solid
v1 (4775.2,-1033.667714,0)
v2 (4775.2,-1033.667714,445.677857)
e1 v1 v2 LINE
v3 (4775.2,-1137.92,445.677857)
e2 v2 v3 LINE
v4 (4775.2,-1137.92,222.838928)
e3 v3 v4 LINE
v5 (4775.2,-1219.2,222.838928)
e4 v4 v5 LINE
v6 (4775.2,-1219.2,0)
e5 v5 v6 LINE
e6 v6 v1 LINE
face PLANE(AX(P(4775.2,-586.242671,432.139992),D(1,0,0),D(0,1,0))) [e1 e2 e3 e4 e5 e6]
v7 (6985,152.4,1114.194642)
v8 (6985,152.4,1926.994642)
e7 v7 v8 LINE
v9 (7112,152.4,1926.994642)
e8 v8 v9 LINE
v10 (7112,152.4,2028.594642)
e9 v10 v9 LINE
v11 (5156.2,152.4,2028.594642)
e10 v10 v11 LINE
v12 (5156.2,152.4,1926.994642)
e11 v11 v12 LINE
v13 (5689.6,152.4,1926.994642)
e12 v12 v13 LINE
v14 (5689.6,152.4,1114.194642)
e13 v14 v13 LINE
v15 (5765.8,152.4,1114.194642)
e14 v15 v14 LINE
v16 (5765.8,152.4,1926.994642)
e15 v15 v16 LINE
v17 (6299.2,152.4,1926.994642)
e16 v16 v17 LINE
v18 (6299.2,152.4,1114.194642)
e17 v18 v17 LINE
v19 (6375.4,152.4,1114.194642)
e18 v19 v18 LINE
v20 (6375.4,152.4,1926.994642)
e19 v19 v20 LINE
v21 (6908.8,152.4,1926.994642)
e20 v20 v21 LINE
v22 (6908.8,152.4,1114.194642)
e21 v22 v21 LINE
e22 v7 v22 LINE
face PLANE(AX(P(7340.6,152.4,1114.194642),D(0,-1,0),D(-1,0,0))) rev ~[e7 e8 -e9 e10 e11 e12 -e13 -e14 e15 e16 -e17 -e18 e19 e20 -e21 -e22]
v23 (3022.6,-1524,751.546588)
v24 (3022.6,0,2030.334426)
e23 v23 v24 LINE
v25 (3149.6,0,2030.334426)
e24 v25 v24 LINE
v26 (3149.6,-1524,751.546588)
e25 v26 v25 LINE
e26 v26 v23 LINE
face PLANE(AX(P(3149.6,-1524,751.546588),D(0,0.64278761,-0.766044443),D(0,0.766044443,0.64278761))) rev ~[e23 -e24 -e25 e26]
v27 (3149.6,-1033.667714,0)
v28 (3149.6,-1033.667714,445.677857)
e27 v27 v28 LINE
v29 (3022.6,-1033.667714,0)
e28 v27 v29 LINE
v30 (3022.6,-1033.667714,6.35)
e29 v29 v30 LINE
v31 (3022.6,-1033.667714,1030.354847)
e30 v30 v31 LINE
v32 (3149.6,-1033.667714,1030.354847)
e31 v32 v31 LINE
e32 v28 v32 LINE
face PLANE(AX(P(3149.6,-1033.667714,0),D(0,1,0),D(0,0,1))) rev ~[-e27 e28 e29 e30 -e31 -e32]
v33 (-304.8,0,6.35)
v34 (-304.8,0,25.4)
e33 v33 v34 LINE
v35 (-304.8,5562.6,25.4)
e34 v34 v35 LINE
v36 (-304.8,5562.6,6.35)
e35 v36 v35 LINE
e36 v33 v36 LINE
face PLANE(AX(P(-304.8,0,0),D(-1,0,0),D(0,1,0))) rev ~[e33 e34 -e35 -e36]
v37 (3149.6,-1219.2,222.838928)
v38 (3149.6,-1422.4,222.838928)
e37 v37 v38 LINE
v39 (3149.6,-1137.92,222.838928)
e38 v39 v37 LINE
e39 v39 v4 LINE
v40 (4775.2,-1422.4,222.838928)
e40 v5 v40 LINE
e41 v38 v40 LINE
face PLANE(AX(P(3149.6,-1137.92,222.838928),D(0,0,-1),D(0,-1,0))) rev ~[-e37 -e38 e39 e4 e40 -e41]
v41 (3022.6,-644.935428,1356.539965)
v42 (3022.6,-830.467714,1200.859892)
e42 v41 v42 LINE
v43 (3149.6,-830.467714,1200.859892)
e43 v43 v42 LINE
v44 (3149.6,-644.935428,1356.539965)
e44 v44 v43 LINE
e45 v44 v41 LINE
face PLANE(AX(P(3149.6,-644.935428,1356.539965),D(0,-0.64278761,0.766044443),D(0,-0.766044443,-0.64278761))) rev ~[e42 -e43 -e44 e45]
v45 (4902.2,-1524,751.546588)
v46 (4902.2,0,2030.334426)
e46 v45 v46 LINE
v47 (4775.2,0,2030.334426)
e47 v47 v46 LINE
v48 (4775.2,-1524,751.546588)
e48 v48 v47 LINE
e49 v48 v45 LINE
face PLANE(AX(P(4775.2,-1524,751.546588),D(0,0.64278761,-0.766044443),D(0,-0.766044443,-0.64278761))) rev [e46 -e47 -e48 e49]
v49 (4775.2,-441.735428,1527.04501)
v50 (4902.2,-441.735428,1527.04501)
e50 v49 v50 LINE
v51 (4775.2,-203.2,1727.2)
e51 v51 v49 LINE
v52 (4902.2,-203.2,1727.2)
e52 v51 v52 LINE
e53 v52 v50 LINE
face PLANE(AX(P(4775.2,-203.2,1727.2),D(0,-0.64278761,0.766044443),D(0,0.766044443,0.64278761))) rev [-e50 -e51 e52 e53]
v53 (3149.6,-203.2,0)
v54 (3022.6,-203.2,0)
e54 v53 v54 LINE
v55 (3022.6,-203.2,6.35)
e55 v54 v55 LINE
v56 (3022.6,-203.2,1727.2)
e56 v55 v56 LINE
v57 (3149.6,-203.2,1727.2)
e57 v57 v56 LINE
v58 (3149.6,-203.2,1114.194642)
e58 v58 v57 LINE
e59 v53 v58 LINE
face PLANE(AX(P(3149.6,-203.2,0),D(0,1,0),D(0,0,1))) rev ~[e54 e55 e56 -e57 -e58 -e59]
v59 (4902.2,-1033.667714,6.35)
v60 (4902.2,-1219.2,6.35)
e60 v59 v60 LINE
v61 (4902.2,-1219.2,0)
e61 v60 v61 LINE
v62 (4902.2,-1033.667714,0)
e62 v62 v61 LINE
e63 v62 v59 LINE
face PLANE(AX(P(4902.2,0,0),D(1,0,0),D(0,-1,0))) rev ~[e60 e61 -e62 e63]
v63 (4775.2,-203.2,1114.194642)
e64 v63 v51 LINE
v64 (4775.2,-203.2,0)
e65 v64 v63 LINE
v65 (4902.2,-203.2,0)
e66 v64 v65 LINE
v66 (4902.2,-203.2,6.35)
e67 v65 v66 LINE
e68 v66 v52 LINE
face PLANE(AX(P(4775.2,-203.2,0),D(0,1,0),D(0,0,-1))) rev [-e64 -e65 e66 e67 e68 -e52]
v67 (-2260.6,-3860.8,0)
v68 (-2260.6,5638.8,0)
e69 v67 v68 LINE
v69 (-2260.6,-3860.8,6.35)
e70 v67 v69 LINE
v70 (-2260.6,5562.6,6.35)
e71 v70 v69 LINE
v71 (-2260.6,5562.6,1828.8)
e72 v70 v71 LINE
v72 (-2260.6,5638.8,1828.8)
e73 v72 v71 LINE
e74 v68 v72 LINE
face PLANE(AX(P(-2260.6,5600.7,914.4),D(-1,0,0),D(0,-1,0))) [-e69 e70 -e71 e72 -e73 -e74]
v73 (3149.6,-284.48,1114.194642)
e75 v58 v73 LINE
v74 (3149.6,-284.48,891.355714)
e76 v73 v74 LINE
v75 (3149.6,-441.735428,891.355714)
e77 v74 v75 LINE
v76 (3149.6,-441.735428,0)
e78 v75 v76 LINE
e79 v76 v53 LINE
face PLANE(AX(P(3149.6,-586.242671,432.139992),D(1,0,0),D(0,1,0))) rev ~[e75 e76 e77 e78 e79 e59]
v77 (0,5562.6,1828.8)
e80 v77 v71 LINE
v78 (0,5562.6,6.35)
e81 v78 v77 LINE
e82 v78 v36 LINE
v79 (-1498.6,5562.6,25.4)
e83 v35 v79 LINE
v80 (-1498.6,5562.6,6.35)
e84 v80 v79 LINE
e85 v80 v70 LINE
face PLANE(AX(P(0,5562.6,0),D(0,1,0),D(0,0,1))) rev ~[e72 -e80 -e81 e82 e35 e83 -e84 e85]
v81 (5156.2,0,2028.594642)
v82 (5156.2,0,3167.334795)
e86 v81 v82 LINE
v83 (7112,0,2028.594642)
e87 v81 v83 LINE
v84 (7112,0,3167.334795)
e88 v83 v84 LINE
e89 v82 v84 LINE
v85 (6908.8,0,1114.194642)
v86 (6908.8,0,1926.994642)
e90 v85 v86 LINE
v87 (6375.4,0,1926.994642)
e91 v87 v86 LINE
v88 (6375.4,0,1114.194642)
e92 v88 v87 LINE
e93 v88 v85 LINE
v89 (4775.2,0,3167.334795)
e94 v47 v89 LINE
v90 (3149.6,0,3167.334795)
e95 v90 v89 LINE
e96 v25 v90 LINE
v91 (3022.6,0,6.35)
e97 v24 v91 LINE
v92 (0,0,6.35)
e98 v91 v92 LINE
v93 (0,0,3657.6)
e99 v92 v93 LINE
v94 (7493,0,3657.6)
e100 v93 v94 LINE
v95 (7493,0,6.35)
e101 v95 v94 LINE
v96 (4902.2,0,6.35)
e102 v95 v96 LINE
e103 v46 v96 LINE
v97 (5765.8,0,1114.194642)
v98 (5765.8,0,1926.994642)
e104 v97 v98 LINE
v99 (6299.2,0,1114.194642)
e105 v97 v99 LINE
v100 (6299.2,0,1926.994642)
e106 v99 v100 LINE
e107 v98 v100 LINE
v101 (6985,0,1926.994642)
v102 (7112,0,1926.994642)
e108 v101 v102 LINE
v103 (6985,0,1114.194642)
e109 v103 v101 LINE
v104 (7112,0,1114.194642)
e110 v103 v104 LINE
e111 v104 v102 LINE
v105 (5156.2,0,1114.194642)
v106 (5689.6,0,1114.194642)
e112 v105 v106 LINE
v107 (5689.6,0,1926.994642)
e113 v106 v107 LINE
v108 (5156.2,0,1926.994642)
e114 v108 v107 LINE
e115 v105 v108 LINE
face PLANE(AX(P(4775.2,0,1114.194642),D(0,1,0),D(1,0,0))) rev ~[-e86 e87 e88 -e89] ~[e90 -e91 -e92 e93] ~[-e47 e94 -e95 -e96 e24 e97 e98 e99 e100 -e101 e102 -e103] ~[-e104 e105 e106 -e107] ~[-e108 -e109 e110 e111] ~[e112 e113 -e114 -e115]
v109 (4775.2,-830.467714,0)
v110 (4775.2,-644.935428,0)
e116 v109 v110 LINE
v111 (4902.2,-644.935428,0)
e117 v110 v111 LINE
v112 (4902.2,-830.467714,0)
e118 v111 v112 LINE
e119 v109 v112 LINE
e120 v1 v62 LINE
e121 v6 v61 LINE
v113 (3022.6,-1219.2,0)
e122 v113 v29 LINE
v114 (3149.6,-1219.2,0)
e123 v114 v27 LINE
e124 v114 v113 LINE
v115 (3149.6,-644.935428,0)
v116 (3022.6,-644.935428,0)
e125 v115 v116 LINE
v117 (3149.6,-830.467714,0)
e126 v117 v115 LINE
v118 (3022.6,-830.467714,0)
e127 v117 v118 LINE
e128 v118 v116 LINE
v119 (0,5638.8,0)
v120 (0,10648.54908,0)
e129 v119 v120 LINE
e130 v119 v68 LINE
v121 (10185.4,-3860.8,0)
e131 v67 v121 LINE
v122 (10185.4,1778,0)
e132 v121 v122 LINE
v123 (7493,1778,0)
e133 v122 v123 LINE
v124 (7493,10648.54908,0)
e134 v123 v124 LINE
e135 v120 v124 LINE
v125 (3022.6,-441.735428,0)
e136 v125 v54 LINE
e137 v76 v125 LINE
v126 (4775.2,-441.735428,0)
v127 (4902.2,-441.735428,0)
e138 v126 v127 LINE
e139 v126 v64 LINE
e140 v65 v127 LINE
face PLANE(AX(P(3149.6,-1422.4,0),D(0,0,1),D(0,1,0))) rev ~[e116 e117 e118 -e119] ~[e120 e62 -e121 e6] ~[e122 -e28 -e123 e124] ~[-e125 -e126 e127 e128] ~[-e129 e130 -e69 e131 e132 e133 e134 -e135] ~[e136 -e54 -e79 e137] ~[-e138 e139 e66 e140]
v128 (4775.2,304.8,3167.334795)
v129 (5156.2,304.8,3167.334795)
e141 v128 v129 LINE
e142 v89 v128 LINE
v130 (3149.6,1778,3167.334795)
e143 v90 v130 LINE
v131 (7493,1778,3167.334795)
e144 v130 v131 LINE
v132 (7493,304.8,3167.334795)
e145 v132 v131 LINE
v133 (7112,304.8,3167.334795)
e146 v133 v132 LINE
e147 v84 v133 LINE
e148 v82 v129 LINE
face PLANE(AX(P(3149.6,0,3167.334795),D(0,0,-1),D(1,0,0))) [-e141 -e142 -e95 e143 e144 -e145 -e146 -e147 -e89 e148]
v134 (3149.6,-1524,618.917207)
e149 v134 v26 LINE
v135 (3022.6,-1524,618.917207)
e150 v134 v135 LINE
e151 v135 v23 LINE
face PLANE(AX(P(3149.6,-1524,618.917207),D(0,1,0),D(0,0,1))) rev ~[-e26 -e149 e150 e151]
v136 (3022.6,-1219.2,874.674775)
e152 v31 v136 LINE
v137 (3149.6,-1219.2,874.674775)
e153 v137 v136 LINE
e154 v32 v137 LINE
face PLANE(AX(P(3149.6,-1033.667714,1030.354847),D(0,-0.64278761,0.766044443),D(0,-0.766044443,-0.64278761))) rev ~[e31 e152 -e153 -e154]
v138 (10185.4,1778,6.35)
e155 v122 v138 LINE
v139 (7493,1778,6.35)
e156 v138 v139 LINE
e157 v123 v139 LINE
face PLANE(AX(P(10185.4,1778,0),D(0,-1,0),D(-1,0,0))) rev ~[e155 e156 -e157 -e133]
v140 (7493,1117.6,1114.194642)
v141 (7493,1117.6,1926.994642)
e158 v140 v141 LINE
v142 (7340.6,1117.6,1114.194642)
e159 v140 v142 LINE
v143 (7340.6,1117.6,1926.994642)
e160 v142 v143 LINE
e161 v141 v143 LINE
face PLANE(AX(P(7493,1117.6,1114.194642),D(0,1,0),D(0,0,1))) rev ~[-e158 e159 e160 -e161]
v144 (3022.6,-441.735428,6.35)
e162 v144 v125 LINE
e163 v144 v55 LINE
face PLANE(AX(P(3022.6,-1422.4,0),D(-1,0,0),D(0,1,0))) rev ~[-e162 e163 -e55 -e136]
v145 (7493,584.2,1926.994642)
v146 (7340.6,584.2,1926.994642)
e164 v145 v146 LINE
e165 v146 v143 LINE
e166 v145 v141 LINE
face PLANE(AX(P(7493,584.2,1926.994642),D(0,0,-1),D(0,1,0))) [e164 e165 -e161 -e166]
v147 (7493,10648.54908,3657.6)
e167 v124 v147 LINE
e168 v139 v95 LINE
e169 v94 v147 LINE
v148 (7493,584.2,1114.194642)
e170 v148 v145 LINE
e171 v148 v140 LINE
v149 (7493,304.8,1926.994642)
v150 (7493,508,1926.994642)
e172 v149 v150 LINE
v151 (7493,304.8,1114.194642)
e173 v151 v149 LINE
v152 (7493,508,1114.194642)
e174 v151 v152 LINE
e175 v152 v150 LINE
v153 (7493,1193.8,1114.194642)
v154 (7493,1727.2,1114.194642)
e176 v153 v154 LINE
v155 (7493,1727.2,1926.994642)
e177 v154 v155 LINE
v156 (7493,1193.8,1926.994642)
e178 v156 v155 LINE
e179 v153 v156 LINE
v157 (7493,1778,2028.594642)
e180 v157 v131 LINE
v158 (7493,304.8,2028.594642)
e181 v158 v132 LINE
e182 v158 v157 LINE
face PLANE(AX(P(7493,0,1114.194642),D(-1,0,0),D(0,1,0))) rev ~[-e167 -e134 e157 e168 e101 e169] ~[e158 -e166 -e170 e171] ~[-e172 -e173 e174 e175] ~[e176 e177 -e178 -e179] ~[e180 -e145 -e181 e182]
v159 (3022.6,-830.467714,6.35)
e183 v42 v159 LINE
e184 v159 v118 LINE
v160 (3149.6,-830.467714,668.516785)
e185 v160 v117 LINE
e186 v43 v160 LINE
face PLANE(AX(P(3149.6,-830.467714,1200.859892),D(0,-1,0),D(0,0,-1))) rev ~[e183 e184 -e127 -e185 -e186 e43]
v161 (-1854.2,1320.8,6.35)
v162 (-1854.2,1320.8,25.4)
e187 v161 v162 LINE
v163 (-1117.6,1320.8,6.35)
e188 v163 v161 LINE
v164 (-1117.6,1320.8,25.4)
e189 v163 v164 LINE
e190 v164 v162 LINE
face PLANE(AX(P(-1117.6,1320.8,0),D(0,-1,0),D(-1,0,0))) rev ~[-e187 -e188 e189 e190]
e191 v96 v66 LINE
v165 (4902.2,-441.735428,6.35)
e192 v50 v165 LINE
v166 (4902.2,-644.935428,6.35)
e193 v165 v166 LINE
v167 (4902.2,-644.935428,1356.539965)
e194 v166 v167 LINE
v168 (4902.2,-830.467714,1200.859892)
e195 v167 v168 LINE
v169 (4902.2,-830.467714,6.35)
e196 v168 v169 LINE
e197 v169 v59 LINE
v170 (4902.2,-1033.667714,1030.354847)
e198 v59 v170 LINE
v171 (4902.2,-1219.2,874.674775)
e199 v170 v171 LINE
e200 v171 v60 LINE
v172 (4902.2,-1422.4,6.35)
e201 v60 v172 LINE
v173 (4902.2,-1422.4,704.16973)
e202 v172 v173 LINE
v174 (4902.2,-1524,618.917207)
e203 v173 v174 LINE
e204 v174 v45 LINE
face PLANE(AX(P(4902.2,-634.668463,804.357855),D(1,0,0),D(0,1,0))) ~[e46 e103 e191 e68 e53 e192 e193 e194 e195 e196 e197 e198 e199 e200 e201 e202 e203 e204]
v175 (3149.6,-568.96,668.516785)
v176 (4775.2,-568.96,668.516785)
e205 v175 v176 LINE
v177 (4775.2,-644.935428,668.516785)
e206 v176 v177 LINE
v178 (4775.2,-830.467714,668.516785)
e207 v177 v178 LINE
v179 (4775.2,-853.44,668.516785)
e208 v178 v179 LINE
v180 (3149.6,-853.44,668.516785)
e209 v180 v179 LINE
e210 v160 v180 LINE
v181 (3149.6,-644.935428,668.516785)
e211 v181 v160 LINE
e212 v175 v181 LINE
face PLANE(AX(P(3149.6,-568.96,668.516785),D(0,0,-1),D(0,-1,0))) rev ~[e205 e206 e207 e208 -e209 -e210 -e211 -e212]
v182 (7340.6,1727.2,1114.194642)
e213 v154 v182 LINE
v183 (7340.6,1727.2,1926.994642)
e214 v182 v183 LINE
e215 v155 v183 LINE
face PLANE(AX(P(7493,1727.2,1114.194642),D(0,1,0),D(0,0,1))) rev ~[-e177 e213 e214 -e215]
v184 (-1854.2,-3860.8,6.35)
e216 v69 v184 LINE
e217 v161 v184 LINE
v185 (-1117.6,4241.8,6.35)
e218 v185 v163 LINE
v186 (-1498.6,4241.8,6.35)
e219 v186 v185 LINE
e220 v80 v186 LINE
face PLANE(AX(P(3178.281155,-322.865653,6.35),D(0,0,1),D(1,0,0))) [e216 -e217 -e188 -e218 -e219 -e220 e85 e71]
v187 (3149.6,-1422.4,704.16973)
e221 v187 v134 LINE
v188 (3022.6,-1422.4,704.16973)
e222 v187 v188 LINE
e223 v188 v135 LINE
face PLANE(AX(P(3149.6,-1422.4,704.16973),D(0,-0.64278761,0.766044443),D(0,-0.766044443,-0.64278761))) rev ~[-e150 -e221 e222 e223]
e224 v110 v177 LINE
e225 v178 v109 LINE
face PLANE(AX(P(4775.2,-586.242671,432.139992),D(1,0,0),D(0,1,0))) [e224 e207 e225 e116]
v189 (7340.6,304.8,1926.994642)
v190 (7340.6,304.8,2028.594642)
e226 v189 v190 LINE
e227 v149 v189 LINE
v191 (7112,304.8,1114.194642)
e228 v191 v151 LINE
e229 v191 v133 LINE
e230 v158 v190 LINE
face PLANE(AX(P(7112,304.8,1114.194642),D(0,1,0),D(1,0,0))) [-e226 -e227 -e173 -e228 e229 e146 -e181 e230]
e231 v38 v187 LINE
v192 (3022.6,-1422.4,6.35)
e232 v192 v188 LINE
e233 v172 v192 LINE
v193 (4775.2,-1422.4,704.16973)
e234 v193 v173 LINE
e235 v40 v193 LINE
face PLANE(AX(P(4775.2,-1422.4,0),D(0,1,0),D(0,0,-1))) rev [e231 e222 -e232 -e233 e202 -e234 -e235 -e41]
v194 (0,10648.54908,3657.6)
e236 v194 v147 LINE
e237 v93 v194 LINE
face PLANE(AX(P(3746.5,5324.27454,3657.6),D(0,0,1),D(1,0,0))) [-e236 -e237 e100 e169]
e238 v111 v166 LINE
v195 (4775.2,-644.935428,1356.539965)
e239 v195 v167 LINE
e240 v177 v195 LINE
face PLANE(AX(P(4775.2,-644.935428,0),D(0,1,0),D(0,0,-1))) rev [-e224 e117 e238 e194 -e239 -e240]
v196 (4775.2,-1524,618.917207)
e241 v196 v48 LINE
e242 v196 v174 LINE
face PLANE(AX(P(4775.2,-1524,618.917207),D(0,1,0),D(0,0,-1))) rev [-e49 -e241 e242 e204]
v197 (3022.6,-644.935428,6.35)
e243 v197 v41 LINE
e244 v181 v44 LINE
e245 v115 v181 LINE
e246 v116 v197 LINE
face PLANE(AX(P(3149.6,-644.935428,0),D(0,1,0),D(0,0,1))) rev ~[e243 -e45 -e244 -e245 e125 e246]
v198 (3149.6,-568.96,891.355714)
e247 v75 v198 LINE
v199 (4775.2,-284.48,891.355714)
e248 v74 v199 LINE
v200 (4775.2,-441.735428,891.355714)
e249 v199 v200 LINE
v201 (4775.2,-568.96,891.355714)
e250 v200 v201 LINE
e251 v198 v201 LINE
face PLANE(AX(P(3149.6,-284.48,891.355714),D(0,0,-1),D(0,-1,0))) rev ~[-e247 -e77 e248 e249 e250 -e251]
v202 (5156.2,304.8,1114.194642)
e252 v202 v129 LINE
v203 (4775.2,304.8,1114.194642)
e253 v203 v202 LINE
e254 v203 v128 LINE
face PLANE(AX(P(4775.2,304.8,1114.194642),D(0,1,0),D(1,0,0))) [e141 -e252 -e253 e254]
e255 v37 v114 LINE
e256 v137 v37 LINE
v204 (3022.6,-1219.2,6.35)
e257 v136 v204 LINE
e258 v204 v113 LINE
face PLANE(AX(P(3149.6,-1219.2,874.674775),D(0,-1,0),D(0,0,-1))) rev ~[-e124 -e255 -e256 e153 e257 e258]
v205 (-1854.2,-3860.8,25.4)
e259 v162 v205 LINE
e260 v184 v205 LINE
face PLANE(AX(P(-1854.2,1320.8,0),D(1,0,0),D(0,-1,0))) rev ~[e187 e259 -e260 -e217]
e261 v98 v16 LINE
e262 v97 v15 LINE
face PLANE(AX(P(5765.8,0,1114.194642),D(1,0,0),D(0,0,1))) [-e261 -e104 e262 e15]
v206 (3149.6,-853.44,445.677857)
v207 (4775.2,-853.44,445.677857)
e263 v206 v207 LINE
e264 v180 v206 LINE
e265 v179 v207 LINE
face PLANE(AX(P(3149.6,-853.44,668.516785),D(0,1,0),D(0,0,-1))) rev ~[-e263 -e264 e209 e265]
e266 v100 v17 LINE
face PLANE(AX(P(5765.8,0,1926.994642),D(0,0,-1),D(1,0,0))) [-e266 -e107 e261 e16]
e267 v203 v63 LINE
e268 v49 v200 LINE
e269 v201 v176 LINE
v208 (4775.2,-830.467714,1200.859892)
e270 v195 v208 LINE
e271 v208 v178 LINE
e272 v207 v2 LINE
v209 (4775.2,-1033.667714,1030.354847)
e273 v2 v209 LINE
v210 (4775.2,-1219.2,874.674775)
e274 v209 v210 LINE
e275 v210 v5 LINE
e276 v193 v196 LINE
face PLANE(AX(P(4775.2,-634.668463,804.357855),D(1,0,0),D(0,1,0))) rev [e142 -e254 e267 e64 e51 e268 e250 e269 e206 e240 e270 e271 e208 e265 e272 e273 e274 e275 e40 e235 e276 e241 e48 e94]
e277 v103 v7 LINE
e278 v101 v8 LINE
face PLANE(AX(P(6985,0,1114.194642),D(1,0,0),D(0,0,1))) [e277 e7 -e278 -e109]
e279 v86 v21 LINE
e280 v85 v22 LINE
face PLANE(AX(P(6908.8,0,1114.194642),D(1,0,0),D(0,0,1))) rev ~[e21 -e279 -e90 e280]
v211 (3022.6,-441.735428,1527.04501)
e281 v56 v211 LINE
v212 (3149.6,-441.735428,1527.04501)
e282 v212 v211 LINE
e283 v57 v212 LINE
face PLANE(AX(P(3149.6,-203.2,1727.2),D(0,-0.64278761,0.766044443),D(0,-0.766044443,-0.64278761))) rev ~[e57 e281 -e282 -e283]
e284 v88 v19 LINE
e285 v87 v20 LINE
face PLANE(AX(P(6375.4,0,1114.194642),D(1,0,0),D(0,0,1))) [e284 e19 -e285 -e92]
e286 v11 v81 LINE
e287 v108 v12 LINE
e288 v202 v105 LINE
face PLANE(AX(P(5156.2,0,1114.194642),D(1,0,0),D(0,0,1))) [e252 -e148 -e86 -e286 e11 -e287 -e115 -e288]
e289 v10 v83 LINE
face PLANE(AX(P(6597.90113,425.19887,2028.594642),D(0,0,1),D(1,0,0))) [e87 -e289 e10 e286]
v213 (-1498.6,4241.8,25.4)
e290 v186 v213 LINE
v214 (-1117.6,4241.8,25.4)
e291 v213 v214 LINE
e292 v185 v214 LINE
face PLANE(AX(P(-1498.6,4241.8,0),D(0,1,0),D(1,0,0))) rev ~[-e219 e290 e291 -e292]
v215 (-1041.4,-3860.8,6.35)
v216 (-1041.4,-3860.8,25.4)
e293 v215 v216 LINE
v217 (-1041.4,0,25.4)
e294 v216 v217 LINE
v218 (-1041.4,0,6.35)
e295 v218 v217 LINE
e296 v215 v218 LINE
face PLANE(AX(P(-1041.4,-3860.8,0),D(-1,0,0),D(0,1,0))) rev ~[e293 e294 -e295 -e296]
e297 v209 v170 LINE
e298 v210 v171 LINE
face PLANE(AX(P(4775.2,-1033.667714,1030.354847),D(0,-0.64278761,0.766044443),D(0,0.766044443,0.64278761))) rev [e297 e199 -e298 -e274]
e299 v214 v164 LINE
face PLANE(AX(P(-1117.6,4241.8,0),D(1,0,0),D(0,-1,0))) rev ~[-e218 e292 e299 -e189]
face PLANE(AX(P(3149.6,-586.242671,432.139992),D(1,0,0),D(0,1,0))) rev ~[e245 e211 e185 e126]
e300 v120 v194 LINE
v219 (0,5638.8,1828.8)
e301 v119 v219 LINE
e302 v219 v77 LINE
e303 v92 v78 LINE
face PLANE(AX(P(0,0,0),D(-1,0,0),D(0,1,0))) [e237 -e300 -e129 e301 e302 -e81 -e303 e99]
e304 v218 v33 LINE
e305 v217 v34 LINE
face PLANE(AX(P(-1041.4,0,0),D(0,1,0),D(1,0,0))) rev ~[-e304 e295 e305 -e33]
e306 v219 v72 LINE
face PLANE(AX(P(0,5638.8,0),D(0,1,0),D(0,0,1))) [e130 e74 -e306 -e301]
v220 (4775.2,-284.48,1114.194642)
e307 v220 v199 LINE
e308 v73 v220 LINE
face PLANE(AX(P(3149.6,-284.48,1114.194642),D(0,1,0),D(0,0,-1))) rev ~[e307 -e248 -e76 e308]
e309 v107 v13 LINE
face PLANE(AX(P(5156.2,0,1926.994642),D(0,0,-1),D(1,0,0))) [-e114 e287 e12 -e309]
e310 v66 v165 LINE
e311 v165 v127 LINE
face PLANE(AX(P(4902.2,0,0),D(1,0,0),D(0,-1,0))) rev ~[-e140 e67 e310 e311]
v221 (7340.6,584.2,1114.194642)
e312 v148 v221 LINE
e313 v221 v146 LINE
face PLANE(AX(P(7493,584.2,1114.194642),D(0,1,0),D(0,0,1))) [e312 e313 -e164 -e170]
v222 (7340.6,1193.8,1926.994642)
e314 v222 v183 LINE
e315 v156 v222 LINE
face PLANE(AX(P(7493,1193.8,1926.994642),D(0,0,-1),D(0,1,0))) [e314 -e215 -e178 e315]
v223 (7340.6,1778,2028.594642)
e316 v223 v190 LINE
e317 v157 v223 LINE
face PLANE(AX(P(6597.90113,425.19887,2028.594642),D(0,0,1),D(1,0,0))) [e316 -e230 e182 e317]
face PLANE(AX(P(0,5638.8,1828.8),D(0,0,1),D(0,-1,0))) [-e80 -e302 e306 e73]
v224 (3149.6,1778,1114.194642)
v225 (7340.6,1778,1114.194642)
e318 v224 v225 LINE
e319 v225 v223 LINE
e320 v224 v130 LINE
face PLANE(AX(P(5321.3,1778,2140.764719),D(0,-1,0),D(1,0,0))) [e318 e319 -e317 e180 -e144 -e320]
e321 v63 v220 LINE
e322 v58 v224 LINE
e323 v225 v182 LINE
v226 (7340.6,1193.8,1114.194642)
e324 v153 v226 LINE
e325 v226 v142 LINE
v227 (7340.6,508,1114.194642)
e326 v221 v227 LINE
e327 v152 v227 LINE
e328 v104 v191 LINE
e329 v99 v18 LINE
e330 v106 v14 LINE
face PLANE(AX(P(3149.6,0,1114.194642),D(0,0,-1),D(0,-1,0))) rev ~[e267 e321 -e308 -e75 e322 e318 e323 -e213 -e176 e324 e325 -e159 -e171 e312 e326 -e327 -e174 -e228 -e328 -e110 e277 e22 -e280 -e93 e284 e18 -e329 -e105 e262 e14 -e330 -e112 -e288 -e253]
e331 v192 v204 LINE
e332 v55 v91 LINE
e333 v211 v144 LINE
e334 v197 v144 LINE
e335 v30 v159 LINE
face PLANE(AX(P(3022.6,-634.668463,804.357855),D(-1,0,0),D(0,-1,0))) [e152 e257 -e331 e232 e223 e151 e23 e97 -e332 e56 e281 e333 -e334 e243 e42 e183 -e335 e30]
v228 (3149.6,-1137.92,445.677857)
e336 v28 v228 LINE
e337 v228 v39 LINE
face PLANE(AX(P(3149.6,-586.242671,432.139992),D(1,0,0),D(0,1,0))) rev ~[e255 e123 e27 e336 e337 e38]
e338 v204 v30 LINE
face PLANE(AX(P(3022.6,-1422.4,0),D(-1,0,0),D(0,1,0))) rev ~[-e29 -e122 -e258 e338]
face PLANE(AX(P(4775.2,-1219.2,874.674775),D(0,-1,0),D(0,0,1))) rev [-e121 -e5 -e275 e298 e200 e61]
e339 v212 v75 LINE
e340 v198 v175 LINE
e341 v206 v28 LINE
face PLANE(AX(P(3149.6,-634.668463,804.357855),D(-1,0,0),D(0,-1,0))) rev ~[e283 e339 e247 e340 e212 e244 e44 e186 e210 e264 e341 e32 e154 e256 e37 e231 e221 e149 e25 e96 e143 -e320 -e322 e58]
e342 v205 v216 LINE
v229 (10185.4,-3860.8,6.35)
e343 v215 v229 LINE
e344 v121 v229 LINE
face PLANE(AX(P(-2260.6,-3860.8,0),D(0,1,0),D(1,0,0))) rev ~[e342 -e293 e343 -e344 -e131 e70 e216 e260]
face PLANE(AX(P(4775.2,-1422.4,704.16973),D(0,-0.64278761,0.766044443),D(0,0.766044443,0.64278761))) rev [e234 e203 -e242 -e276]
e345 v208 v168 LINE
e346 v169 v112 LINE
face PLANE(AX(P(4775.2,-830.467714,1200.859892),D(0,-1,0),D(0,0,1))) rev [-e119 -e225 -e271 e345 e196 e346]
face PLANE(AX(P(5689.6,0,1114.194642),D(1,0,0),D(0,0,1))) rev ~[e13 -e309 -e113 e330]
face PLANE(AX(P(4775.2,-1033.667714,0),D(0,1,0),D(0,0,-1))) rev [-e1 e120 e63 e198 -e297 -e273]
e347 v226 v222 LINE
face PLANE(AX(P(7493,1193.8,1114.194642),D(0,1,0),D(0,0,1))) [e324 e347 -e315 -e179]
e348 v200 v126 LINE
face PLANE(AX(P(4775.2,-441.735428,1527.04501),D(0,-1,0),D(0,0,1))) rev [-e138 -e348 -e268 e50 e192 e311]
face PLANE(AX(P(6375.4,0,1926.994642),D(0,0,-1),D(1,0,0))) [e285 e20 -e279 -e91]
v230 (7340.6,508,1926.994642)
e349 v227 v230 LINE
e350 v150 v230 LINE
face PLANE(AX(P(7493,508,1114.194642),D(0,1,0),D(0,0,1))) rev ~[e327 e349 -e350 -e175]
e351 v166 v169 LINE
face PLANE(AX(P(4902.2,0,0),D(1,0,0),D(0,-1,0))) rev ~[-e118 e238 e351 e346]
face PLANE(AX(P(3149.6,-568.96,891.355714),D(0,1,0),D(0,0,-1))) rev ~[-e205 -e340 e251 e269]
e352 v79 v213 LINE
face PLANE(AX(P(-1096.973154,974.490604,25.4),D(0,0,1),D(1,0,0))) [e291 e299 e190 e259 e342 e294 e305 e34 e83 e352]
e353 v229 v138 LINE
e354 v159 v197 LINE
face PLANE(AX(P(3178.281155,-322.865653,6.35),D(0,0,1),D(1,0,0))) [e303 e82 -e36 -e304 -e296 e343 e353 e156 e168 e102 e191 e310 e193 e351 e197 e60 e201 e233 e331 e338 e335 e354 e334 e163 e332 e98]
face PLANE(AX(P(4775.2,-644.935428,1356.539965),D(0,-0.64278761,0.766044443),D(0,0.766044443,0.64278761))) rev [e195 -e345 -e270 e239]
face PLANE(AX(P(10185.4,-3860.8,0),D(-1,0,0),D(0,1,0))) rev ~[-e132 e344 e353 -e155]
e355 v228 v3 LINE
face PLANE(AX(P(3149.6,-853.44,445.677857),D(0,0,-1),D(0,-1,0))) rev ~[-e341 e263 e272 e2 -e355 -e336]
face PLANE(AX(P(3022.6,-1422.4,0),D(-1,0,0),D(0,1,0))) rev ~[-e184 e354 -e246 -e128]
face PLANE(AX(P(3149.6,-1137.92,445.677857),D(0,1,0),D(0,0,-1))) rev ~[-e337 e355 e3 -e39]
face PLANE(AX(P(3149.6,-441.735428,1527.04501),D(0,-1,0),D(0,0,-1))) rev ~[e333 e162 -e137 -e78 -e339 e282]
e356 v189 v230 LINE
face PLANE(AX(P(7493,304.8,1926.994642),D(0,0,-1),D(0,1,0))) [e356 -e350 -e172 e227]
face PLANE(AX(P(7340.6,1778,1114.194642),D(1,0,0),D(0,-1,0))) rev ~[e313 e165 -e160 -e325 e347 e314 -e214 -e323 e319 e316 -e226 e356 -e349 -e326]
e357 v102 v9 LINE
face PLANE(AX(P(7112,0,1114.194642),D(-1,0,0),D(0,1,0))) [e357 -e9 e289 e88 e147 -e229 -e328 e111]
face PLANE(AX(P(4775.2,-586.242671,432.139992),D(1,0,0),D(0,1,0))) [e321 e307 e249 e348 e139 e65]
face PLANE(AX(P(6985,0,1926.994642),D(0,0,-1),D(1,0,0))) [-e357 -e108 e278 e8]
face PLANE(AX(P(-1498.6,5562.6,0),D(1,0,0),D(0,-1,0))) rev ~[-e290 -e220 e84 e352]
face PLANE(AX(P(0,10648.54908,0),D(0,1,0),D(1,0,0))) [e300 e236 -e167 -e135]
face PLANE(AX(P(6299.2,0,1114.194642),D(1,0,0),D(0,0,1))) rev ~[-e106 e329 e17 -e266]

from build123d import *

# Parameters (mm, degrees)
F2_W      = 7493
F2_H      = 10648.549079895
F3_DEPTH  = 3657.6
F4_W      = 4343.4
F4_H      = 2053.1401527691
F5_DEPTH  = 1778
F7_DEPTH  = 914.4
F8_W      = 533.4
F8_H      = 812.8
F9_DEPTH  = 304.8
F10_W     = 533.4
F10_H     = 812.8
F11_DEPTH = 254
F12_W     = 381
F12_H     = 304.8
F13_DEPTH = 2540
F14_W     = 203.2
F14_H     = 812.8
F15_DEPTH = 254
F16_W     = 127
F16_H     = 812.8
F18_DEPTH = 254
F20_DEPTH = 1625.6
F22_DEPTH = 127
F24_W     = 76.2
F24_H     = 1828.8
F25_DEPTH = 2260.6
F26_DEPTH = 25.4
F28_DEPTH = 6.35


# Not quite as in the source:
# - a pattern or mirror of a feature is missing from the dataset's text; its kind, count and spacing are read off the source's solid


with BuildPart() as f3:
    # F2 (on Top) → F3 (new body)
    with BuildSketch(Plane.XY):
        with Locations((3746.5, 5324.2745399475)):
            Rectangle(F2_W, F2_H)
    extrude(amount=F3_DEPTH)

    # F4 (on face) → F5 (cut)
    with BuildSketch(Plane.XZ):
        with Locations((5321.3, 2140.7647186136)):
            Rectangle(F4_W, F4_H)
    extrude(amount=-F5_DEPTH, mode=Mode.SUBTRACT)

    # F6 (on face) → F7 (join)
    with BuildSketch(Plane.XY.offset(1114.1946422291)):
        Polygon((4775.2, 152.4), (4775.2, 0), (7493, 0), (7493, 1778), (7340.6, 1778), (7340.6, 152.4), align=None)
    extrude(amount=F7_DEPTH)

    # F8 (on face) → F9 (cut)
    with BuildSketch(Plane.XZ):
        with Locations((5422.9, 1520.5946422291)):
            Rectangle(F8_W, F8_H)
        with Locations((6032.5, 1520.5946422291)):
            Rectangle(F8_W, F8_H)
        with Locations((6642.1, 1520.5946422291)):
            Rectangle(F8_W, F8_H)
    extrude(amount=-F9_DEPTH, mode=Mode.SUBTRACT)

    # F10 (on face) → F11 (cut)
    with BuildSketch(Plane.YZ.offset(7493)):
        with Locations((1460.5, 1520.5946422291)):
            Rectangle(F10_W, F10_H)
        with Locations((850.9, 1520.5946422291)):
            Rectangle(F10_W, F10_H)
    extrude(amount=-F11_DEPTH, mode=Mode.SUBTRACT)

    # F12 (on face) → F13 (join)
    with BuildSketch(Plane.XY.offset(1114.1946422291)):
        with Locations((4965.7, 152.4)):
            Rectangle(F12_W, F12_H)
        with Locations((7302.5, 152.4)):
            Rectangle(F12_W, F12_H)
    extrude(amount=F13_DEPTH)

    # F14 (on face) → F15 (cut)
    with BuildSketch(Plane.YZ.offset(7493)):
        with Locations((406.4, 1520.5946422291)):
            Rectangle(F14_W, F14_H)
    extrude(amount=-F15_DEPTH, mode=Mode.SUBTRACT)

    # F16 (on face) → F18 (cut)
    with BuildSketch(Plane.XZ):
        with Locations((7048.5, 1520.5946422291)):
            Rectangle(F16_W, F16_H)
    extrude(amount=-F18_DEPTH, mode=Mode.SUBTRACT)

    # F19 (on offset) → F20 (join, through all)
    with BuildSketch(Plane.YZ.offset(3149.6)):
        Polygon((0, 0), (0, 1114.1946422291), (-284.48, 1114.1946422291), (-284.48, 891.3557137833), (-568.96, 891.3557137833), (-568.96, 668.5167853374), (-853.44, 668.5167853374), (-853.44, 445.6778568916), (-1137.92, 445.6778568916), (-1137.92, 222.8389284458), (-1422.4, 222.8389284458), (-1422.4, 0), align=None)
    extrude(amount=F20_DEPTH)

    # F21 (on face) → F22 (join)
    with BuildSketch(Plane(origin=(3149.6, 0, 0), x_dir=(0, -1, 0), z_dir=(-1, 0, 0))):
        Polygon((1524, 751.5465877372), (0, 2030.3344256514), (0, 0), (203.2, 0), (203.2, 1727.2), (441.7354282745, 1527.0450101121), (441.7354282745, 0), (644.9354282745, 0), (644.9354282745, 1356.5399650569), (830.4677141373, 1200.859892418), (830.4677141373, 0), (1033.6677141373, 0), (1033.6677141373, 1030.3548473628), (1219.2, 874.6747747239), (1219.2, 0), (1422.4, 0), (1422.4, 704.1697296687), (1524, 618.917207141), align=None)
    f22 = extrude(amount=F22_DEPTH)

    # F22_copies: F22 across plane
    add(f22.mirror(Plane(origin=(3962.4, 0, 0), x_dir=(0, 0, 1), z_dir=(1, 0, 0))))

    # F24 (on face) → F25 (join, through all)
    with BuildSketch(Plane(origin=(0, 0, 0), x_dir=(0, -1, 0), z_dir=(-1, 0, 0))):
        with Locations((-5600.7, 914.4)):
            Rectangle(F24_W, F24_H)
    extrude(amount=F25_DEPTH)

    # F1 (on Top) → F26 (join)
    with BuildSketch(Plane.XY):
        Polygon((-304.8, 5562.6), (-1498.6, 5562.6), (-1498.6, 4241.8), (-1117.6, 4241.8), (-1117.6, 1320.8), (-1854.2, 1320.8), (-1854.2, -3860.8), (-1041.4, -3860.8), (-1041.4, 0), (-304.8, 0), (-304.8, 4244.8759078979), align=None)
    extrude(amount=F26_DEPTH)

    # F27 (on Top) → F28 (join)
    with BuildSketch(Plane.XY):
        Polygon((0, 5562.6), (-2260.6000000001, 5562.6), (-2260.6000000001, -3860.8), (0, -3860.8), (10185.4, -3860.8), (10185.4, 1778), (7493, 1778), (7493, 0), (4902.2, 0), (4902.2, -1422.4), (4775.2, -1422.4), (3022.6, -1422.4), (3022.6, 0), (0, 0), align=None)
    extrude(amount=F28_DEPTH)


solid = f3.part
